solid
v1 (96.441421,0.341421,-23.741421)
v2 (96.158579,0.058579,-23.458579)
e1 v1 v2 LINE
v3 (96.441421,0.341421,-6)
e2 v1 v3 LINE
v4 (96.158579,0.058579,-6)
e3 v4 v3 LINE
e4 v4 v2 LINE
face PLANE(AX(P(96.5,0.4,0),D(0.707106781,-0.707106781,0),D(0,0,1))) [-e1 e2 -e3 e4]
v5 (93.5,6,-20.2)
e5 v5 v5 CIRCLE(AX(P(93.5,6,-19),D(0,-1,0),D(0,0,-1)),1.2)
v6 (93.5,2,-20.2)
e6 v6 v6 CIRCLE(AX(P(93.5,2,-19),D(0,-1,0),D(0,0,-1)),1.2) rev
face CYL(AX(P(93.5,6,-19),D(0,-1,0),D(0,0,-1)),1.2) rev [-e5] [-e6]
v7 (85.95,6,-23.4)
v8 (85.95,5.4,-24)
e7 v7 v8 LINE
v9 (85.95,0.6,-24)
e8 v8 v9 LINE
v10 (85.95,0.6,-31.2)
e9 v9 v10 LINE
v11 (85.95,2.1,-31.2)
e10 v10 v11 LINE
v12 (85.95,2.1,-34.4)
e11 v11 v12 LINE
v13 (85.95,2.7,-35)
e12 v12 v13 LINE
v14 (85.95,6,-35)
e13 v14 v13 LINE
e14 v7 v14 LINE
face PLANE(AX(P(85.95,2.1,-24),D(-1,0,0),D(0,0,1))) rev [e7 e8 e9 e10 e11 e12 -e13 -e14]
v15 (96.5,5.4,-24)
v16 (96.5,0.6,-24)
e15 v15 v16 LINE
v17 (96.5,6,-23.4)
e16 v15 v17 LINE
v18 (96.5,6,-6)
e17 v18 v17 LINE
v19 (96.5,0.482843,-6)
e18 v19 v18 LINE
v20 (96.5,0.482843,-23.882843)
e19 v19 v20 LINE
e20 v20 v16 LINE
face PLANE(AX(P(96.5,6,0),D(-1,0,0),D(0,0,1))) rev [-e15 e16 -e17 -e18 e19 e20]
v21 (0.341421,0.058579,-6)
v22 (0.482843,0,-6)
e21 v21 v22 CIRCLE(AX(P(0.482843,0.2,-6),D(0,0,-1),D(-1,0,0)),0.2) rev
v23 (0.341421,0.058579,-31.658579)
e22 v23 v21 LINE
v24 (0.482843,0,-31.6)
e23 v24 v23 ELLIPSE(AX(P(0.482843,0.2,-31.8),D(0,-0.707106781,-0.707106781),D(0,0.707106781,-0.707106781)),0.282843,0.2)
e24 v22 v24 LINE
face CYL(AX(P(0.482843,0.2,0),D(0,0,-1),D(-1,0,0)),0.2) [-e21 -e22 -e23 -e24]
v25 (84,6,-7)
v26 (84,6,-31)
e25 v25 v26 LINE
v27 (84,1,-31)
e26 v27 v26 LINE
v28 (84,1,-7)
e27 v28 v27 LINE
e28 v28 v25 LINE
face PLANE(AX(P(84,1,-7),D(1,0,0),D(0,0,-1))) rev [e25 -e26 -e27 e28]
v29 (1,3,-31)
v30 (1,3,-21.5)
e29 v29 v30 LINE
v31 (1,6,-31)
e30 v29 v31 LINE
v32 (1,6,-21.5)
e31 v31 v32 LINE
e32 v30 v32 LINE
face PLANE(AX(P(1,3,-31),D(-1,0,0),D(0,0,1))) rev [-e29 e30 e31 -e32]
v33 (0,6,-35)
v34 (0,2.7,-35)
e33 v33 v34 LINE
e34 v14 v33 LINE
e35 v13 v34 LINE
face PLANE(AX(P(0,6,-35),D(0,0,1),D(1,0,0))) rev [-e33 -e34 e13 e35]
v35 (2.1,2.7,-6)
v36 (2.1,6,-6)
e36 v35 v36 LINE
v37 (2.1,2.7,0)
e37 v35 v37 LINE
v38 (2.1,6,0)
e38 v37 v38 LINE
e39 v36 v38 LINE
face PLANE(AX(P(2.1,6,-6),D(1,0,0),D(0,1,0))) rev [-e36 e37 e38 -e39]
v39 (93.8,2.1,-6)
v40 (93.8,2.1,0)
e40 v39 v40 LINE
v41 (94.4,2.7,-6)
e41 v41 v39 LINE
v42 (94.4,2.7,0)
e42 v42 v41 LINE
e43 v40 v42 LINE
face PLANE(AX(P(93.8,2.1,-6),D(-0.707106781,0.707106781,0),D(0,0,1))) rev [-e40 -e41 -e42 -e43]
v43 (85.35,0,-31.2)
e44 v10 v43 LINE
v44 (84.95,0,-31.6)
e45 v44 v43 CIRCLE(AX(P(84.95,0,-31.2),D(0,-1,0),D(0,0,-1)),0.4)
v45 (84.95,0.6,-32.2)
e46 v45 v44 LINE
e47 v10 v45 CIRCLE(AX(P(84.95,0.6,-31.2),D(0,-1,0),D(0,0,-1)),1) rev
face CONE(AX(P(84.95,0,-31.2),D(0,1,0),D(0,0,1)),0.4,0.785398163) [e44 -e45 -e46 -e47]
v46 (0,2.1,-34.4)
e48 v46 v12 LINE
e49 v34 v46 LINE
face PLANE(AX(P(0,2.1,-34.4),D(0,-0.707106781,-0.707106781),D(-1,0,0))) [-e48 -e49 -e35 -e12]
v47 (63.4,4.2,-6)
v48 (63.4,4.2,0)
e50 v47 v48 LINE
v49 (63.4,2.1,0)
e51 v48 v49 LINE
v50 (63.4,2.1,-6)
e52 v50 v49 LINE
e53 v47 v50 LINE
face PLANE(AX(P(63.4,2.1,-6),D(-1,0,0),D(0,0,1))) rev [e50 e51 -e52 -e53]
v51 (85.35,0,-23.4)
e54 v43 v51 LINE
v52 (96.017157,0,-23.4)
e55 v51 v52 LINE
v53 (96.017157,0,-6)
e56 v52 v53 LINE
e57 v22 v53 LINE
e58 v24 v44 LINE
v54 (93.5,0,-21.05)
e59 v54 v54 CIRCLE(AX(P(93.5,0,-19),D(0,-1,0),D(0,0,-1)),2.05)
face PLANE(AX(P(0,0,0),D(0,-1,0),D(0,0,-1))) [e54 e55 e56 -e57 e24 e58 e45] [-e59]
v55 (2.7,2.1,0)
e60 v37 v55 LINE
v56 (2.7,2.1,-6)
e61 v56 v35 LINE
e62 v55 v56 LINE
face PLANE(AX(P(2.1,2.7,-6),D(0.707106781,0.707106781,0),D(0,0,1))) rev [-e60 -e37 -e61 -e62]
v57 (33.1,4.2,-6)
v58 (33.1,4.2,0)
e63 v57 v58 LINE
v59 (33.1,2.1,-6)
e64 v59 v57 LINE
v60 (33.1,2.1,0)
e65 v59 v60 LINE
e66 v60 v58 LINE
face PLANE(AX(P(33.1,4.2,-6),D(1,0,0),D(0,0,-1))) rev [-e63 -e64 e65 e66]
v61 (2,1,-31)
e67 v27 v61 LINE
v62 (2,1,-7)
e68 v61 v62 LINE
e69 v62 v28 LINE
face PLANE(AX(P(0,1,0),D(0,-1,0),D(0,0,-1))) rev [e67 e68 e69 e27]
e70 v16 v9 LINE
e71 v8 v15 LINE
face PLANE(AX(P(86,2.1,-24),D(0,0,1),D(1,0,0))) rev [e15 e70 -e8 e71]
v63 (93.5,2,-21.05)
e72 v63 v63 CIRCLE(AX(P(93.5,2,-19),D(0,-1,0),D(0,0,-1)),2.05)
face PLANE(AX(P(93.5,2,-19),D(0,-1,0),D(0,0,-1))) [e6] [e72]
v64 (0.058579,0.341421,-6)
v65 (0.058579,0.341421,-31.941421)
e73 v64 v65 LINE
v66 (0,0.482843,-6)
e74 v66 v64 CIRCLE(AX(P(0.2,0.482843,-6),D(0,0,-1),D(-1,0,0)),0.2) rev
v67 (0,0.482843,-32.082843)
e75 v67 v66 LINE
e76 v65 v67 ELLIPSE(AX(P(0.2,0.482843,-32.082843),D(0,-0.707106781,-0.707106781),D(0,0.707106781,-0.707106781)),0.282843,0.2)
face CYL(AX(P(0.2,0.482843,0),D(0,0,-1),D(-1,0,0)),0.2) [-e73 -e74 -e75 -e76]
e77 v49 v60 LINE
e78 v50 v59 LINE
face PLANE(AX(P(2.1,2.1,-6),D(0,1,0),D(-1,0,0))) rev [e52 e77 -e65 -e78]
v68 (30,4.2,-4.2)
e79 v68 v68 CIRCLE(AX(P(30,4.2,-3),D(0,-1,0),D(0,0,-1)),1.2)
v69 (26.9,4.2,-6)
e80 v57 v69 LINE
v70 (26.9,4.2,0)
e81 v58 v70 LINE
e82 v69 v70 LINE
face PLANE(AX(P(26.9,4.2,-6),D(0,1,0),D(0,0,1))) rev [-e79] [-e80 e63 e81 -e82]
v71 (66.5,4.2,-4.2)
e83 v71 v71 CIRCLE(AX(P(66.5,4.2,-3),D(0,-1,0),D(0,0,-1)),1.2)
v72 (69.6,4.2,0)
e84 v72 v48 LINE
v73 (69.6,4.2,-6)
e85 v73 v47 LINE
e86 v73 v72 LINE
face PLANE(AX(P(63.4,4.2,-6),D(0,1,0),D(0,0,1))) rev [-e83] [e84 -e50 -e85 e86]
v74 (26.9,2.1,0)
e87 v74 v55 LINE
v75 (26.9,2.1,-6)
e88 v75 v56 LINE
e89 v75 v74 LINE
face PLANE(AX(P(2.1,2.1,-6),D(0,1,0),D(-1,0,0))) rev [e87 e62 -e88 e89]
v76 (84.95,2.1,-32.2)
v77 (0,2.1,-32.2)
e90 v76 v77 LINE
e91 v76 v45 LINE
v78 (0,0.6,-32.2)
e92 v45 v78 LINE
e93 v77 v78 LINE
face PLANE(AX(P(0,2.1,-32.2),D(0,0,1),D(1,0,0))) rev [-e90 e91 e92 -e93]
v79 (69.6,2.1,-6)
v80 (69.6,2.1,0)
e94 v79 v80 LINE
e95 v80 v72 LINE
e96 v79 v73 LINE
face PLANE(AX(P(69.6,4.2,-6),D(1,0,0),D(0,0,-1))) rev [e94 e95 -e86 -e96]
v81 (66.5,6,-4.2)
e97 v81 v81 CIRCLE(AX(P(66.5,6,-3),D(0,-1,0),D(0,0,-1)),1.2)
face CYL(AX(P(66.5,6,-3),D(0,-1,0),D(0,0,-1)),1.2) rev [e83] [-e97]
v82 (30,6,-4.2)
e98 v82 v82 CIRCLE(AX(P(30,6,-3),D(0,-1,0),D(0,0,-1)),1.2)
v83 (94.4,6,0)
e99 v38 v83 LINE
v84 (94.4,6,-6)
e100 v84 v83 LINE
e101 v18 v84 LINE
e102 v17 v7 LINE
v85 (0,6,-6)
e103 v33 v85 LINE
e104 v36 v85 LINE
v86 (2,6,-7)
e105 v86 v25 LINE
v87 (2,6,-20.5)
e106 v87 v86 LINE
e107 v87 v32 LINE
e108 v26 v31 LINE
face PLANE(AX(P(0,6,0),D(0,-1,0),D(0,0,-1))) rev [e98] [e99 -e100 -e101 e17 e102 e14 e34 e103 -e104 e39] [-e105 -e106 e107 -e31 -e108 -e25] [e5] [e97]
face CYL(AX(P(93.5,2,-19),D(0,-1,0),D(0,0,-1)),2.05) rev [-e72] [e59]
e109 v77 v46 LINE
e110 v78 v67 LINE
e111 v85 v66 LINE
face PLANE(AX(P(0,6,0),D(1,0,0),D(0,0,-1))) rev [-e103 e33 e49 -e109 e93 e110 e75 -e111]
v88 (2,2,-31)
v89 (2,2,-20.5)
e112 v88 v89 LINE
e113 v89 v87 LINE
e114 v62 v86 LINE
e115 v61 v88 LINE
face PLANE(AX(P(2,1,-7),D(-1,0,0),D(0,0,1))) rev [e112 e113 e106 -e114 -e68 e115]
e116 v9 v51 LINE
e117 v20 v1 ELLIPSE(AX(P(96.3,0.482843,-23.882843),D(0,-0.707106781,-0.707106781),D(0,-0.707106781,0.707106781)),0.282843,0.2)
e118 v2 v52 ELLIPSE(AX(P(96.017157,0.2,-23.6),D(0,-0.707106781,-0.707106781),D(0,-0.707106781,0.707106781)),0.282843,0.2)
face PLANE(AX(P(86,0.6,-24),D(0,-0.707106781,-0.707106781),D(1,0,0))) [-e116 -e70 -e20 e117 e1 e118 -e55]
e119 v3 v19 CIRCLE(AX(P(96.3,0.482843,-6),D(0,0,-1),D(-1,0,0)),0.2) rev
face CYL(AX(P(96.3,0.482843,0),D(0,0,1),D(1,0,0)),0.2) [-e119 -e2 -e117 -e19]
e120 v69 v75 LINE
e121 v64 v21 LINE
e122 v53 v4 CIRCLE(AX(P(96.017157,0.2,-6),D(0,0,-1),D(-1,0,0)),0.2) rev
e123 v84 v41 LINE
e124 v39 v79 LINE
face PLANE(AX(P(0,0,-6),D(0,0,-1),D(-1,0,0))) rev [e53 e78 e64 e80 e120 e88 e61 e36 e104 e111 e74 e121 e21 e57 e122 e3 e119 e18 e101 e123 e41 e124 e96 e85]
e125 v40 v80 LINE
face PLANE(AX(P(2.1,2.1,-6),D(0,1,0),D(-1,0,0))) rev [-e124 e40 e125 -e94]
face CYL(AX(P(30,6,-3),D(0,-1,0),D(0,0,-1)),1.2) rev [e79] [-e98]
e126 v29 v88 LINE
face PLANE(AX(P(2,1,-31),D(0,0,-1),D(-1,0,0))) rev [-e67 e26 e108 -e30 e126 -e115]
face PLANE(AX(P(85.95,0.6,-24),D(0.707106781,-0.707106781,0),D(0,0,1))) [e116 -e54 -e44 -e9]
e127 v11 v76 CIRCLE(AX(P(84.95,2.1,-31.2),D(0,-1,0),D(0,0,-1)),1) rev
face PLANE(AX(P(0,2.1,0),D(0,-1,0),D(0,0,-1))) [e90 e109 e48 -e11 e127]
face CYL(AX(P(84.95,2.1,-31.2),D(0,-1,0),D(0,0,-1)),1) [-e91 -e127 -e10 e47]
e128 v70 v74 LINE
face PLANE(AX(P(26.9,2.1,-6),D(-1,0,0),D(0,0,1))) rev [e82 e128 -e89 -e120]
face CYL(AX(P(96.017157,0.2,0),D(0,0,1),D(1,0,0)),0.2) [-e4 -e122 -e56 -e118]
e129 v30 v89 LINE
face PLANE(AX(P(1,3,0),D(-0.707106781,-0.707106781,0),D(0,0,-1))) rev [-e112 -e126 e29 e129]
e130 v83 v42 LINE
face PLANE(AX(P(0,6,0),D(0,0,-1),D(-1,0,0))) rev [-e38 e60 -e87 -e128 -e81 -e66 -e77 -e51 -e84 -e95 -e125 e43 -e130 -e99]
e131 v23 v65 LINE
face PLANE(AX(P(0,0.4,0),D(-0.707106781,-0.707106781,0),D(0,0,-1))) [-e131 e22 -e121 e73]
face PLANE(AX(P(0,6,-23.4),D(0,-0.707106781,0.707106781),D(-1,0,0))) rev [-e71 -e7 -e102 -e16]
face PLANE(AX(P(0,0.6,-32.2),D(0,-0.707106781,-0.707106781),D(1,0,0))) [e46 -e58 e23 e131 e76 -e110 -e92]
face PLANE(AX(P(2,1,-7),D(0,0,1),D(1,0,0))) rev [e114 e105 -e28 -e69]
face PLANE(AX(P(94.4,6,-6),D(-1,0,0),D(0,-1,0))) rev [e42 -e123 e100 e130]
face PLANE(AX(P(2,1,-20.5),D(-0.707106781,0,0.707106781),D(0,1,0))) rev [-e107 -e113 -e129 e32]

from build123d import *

# Parameters (mm, degrees)
SKETCH_1_W           = 96.5
SKETCH_1_H           = 35
EXTRUDE_1_DEPTH      = 6
SKETCH_2_W           = 82
SKETCH_2_H           = 24
CUT_EXTRUDE_1_DEPTH  = 5
CUT_EXTRUDE_2_DEPTH  = 6
CUT_EXTRUDE_3_DEPTH  = 2.1
FILLET_1_R           = 1
CHAMFER_1_SIZE       = 0.6
CHAMFER_2_SIZE       = 0.4
FILLET_2_R           = 0.2
SKETCH_5_W           = 10.55
SKETCH_5_H           = 11
CUT_EXTRUDE_5_DEPTH  = 103.725167316
CHAMFER_3_SIZE       = 0.6
CHAMFER_4_SIZE       = 0.6
SKETCH_6_W           = 1
SKETCH_6_H           = 9.5
CUT_EXTRUDE_6_DEPTH  = 3
CHAMFER_5_SIZE       = 1
CHAMFER_6_SIZE       = 1
SKETCH_7_W           = 6.2
SKETCH_7_H           = 2.1
CUT_EXTRUDE_7_DEPTH  = 6
SKETCH_8_R           = 1.2
CUT_EXTRUDE_8_DEPTH  = 103.736994311
SKETCH_11_R          = 1.2
CUT_EXTRUDE_9_DEPTH  = 103.826309863
SKETCH_11_3_R        = 2.05
CUT_EXTRUDE_10_DEPTH = 2


with BuildPart() as part:
    # 草图1 → 凸台-拉伸1 (new body)
    with BuildSketch(Plane(origin=(0, 0, 0), x_dir=(1, 0, 0), z_dir=(0, 1, 0))):
        with Locations((48.25, 17.5)):
            Rectangle(SKETCH_1_W, SKETCH_1_H)
    extrude(amount=EXTRUDE_1_DEPTH)

    # 草图2 → 切除-拉伸1 (cut)
    with BuildSketch(Plane(origin=(0, 6, 0), x_dir=(1, 0, 0), z_dir=(0, 1, 0))):
        with Locations((43, 19)):
            Rectangle(SKETCH_2_W, SKETCH_2_H)
    extrude(amount=-CUT_EXTRUDE_1_DEPTH, mode=Mode.SUBTRACT)

    # 草图3 → 切除-拉伸2 (cut)
    with BuildSketch(Plane.XY):
        Polygon((96.5, 6), (96.5, 0), (0, 0), (0, 6), (2.1, 6), (2.1, 2.1), (94.4, 2.1), (94.4, 6), align=None)
    extrude(amount=-CUT_EXTRUDE_2_DEPTH, mode=Mode.SUBTRACT)

    # 草图4 → 切除-拉伸3 (cut)
    with BuildSketch(Plane.XZ):
        Polygon((0, -32.2), (85.95, -32.2), (85.95, -24), (86, -24), (96.5, -24), (96.5, -35), (0, -35), align=None)
    extrude(amount=-CUT_EXTRUDE_3_DEPTH, mode=Mode.SUBTRACT)

    # 圆角1
    fillet_1_edges = [part.edges().sort_by_distance(p)[0] for p in [
        (85.95, 1.05, -32.2),
    ]]
    fillet(fillet_1_edges, radius=FILLET_1_R)

    # 倒角1
    chamfer_1_edges = [part.edges().sort_by_distance(p)[0] for p in [
        (91.225, 0, -24),
        (85.95, 0, -27.6),
        (42.475, 0, -32.2),
        (85.657106781, 0, -31.907106781),
    ]]
    chamfer(chamfer_1_edges, length=CHAMFER_1_SIZE)

    # 倒角2
    chamfer_2_edges = [part.edges().sort_by_distance(p)[0] for p in [
        (96.5, 0, -14.7),
        (0, 0, -18.8),
    ]]
    chamfer(chamfer_2_edges, length=CHAMFER_2_SIZE)

    # 圆角2
    fillet_2_edges = [part.edges().sort_by_distance(p)[0] for p in [
        (96.1, 0, -14.7),
        (0.4, 0, -18.8),
        (96.5, 0.4, -14.9),
        (0, 0.4, -19),
    ]]
    fillet(fillet_2_edges, radius=FILLET_2_R)

    # 草图5 → 切除-拉伸5 (cut, through all)
    with BuildSketch(Plane.XZ.offset(-2.1)):
        with Locations((91.225, -29.5)):
            Rectangle(SKETCH_5_W, SKETCH_5_H)
    extrude(amount=-CUT_EXTRUDE_5_DEPTH, mode=Mode.SUBTRACT)

    # 倒角3
    chamfer_3_edges = [part.edges().sort_by_distance(p)[0] for p in [
        (91.225, 6, -24),
        (2.1, 2.1, -3),
        (94.4, 2.1, -3),
    ]]
    chamfer(chamfer_3_edges, length=CHAMFER_3_SIZE)

    # 倒角4
    chamfer_4_edges = [part.edges().sort_by_distance(p)[0] for p in [
        (42.975, 2.1, -35),
    ]]
    chamfer(chamfer_4_edges, length=CHAMFER_4_SIZE)

    # 草图6 → 切除-拉伸6 (cut)
    with BuildSketch(Plane(origin=(0, 6, 0), x_dir=(1, 0, 0), z_dir=(0, 1, 0))):
        with Locations((1.5, 26.25)):
            Rectangle(SKETCH_6_W, SKETCH_6_H)
    extrude(amount=-CUT_EXTRUDE_6_DEPTH, mode=Mode.SUBTRACT)

    # 倒角5
    chamfer_5_edges = [part.edges().sort_by_distance(p)[0] for p in [
        (2, 3, -26.25),
    ]]
    chamfer(chamfer_5_edges, length=CHAMFER_5_SIZE - 0.0001)  # a hair under: the kernel refuses the full size

    # 倒角6
    chamfer_6_edges = [part.edges().sort_by_distance(p)[0] for p in [
        (2, 4.00005, -21.5),
    ]]
    chamfer(chamfer_6_edges, length=CHAMFER_6_SIZE - 0.0001)  # a hair under: the kernel refuses the full size

    # 草图7 → 切除-拉伸7 (cut)
    with BuildSketch(Plane.XY):
        with Locations((66.5, 3.15)):
            Rectangle(SKETCH_7_W, SKETCH_7_H)
        with Locations((30, 3.15)):
            Rectangle(SKETCH_7_W, SKETCH_7_H)
    extrude(amount=-CUT_EXTRUDE_7_DEPTH, mode=Mode.SUBTRACT)

    # 草图8 → 切除-拉伸8 (cut, through all)
    with BuildSketch(Plane.XZ.offset(-4.2)):
        with Locations(Location((66.5, -3, 0), (0, 0, 270))):
            Circle(SKETCH_8_R)
        with Locations(Location((30, -3, 0), (0, 0, 270))):
            Circle(SKETCH_8_R)
    extrude(amount=-CUT_EXTRUDE_8_DEPTH, mode=Mode.SUBTRACT)

    # 草图11 → 切除-拉伸9 (cut, through all)
    with BuildSketch(Plane.XZ):
        with Locations(Location((93.5, -19, 0), (0, 0, 270))):
            Circle(SKETCH_11_R)
    extrude(amount=-CUT_EXTRUDE_9_DEPTH, mode=Mode.SUBTRACT)

    # 草图11<3> → 切除-拉伸10 (cut)
    with BuildSketch(Plane.XZ):
        with Locations(Location((93.5, -19, 0), (0, 0, 270))):
            Circle(SKETCH_11_3_R)
    extrude(amount=-CUT_EXTRUDE_10_DEPTH, mode=Mode.SUBTRACT)


solid = part.part
